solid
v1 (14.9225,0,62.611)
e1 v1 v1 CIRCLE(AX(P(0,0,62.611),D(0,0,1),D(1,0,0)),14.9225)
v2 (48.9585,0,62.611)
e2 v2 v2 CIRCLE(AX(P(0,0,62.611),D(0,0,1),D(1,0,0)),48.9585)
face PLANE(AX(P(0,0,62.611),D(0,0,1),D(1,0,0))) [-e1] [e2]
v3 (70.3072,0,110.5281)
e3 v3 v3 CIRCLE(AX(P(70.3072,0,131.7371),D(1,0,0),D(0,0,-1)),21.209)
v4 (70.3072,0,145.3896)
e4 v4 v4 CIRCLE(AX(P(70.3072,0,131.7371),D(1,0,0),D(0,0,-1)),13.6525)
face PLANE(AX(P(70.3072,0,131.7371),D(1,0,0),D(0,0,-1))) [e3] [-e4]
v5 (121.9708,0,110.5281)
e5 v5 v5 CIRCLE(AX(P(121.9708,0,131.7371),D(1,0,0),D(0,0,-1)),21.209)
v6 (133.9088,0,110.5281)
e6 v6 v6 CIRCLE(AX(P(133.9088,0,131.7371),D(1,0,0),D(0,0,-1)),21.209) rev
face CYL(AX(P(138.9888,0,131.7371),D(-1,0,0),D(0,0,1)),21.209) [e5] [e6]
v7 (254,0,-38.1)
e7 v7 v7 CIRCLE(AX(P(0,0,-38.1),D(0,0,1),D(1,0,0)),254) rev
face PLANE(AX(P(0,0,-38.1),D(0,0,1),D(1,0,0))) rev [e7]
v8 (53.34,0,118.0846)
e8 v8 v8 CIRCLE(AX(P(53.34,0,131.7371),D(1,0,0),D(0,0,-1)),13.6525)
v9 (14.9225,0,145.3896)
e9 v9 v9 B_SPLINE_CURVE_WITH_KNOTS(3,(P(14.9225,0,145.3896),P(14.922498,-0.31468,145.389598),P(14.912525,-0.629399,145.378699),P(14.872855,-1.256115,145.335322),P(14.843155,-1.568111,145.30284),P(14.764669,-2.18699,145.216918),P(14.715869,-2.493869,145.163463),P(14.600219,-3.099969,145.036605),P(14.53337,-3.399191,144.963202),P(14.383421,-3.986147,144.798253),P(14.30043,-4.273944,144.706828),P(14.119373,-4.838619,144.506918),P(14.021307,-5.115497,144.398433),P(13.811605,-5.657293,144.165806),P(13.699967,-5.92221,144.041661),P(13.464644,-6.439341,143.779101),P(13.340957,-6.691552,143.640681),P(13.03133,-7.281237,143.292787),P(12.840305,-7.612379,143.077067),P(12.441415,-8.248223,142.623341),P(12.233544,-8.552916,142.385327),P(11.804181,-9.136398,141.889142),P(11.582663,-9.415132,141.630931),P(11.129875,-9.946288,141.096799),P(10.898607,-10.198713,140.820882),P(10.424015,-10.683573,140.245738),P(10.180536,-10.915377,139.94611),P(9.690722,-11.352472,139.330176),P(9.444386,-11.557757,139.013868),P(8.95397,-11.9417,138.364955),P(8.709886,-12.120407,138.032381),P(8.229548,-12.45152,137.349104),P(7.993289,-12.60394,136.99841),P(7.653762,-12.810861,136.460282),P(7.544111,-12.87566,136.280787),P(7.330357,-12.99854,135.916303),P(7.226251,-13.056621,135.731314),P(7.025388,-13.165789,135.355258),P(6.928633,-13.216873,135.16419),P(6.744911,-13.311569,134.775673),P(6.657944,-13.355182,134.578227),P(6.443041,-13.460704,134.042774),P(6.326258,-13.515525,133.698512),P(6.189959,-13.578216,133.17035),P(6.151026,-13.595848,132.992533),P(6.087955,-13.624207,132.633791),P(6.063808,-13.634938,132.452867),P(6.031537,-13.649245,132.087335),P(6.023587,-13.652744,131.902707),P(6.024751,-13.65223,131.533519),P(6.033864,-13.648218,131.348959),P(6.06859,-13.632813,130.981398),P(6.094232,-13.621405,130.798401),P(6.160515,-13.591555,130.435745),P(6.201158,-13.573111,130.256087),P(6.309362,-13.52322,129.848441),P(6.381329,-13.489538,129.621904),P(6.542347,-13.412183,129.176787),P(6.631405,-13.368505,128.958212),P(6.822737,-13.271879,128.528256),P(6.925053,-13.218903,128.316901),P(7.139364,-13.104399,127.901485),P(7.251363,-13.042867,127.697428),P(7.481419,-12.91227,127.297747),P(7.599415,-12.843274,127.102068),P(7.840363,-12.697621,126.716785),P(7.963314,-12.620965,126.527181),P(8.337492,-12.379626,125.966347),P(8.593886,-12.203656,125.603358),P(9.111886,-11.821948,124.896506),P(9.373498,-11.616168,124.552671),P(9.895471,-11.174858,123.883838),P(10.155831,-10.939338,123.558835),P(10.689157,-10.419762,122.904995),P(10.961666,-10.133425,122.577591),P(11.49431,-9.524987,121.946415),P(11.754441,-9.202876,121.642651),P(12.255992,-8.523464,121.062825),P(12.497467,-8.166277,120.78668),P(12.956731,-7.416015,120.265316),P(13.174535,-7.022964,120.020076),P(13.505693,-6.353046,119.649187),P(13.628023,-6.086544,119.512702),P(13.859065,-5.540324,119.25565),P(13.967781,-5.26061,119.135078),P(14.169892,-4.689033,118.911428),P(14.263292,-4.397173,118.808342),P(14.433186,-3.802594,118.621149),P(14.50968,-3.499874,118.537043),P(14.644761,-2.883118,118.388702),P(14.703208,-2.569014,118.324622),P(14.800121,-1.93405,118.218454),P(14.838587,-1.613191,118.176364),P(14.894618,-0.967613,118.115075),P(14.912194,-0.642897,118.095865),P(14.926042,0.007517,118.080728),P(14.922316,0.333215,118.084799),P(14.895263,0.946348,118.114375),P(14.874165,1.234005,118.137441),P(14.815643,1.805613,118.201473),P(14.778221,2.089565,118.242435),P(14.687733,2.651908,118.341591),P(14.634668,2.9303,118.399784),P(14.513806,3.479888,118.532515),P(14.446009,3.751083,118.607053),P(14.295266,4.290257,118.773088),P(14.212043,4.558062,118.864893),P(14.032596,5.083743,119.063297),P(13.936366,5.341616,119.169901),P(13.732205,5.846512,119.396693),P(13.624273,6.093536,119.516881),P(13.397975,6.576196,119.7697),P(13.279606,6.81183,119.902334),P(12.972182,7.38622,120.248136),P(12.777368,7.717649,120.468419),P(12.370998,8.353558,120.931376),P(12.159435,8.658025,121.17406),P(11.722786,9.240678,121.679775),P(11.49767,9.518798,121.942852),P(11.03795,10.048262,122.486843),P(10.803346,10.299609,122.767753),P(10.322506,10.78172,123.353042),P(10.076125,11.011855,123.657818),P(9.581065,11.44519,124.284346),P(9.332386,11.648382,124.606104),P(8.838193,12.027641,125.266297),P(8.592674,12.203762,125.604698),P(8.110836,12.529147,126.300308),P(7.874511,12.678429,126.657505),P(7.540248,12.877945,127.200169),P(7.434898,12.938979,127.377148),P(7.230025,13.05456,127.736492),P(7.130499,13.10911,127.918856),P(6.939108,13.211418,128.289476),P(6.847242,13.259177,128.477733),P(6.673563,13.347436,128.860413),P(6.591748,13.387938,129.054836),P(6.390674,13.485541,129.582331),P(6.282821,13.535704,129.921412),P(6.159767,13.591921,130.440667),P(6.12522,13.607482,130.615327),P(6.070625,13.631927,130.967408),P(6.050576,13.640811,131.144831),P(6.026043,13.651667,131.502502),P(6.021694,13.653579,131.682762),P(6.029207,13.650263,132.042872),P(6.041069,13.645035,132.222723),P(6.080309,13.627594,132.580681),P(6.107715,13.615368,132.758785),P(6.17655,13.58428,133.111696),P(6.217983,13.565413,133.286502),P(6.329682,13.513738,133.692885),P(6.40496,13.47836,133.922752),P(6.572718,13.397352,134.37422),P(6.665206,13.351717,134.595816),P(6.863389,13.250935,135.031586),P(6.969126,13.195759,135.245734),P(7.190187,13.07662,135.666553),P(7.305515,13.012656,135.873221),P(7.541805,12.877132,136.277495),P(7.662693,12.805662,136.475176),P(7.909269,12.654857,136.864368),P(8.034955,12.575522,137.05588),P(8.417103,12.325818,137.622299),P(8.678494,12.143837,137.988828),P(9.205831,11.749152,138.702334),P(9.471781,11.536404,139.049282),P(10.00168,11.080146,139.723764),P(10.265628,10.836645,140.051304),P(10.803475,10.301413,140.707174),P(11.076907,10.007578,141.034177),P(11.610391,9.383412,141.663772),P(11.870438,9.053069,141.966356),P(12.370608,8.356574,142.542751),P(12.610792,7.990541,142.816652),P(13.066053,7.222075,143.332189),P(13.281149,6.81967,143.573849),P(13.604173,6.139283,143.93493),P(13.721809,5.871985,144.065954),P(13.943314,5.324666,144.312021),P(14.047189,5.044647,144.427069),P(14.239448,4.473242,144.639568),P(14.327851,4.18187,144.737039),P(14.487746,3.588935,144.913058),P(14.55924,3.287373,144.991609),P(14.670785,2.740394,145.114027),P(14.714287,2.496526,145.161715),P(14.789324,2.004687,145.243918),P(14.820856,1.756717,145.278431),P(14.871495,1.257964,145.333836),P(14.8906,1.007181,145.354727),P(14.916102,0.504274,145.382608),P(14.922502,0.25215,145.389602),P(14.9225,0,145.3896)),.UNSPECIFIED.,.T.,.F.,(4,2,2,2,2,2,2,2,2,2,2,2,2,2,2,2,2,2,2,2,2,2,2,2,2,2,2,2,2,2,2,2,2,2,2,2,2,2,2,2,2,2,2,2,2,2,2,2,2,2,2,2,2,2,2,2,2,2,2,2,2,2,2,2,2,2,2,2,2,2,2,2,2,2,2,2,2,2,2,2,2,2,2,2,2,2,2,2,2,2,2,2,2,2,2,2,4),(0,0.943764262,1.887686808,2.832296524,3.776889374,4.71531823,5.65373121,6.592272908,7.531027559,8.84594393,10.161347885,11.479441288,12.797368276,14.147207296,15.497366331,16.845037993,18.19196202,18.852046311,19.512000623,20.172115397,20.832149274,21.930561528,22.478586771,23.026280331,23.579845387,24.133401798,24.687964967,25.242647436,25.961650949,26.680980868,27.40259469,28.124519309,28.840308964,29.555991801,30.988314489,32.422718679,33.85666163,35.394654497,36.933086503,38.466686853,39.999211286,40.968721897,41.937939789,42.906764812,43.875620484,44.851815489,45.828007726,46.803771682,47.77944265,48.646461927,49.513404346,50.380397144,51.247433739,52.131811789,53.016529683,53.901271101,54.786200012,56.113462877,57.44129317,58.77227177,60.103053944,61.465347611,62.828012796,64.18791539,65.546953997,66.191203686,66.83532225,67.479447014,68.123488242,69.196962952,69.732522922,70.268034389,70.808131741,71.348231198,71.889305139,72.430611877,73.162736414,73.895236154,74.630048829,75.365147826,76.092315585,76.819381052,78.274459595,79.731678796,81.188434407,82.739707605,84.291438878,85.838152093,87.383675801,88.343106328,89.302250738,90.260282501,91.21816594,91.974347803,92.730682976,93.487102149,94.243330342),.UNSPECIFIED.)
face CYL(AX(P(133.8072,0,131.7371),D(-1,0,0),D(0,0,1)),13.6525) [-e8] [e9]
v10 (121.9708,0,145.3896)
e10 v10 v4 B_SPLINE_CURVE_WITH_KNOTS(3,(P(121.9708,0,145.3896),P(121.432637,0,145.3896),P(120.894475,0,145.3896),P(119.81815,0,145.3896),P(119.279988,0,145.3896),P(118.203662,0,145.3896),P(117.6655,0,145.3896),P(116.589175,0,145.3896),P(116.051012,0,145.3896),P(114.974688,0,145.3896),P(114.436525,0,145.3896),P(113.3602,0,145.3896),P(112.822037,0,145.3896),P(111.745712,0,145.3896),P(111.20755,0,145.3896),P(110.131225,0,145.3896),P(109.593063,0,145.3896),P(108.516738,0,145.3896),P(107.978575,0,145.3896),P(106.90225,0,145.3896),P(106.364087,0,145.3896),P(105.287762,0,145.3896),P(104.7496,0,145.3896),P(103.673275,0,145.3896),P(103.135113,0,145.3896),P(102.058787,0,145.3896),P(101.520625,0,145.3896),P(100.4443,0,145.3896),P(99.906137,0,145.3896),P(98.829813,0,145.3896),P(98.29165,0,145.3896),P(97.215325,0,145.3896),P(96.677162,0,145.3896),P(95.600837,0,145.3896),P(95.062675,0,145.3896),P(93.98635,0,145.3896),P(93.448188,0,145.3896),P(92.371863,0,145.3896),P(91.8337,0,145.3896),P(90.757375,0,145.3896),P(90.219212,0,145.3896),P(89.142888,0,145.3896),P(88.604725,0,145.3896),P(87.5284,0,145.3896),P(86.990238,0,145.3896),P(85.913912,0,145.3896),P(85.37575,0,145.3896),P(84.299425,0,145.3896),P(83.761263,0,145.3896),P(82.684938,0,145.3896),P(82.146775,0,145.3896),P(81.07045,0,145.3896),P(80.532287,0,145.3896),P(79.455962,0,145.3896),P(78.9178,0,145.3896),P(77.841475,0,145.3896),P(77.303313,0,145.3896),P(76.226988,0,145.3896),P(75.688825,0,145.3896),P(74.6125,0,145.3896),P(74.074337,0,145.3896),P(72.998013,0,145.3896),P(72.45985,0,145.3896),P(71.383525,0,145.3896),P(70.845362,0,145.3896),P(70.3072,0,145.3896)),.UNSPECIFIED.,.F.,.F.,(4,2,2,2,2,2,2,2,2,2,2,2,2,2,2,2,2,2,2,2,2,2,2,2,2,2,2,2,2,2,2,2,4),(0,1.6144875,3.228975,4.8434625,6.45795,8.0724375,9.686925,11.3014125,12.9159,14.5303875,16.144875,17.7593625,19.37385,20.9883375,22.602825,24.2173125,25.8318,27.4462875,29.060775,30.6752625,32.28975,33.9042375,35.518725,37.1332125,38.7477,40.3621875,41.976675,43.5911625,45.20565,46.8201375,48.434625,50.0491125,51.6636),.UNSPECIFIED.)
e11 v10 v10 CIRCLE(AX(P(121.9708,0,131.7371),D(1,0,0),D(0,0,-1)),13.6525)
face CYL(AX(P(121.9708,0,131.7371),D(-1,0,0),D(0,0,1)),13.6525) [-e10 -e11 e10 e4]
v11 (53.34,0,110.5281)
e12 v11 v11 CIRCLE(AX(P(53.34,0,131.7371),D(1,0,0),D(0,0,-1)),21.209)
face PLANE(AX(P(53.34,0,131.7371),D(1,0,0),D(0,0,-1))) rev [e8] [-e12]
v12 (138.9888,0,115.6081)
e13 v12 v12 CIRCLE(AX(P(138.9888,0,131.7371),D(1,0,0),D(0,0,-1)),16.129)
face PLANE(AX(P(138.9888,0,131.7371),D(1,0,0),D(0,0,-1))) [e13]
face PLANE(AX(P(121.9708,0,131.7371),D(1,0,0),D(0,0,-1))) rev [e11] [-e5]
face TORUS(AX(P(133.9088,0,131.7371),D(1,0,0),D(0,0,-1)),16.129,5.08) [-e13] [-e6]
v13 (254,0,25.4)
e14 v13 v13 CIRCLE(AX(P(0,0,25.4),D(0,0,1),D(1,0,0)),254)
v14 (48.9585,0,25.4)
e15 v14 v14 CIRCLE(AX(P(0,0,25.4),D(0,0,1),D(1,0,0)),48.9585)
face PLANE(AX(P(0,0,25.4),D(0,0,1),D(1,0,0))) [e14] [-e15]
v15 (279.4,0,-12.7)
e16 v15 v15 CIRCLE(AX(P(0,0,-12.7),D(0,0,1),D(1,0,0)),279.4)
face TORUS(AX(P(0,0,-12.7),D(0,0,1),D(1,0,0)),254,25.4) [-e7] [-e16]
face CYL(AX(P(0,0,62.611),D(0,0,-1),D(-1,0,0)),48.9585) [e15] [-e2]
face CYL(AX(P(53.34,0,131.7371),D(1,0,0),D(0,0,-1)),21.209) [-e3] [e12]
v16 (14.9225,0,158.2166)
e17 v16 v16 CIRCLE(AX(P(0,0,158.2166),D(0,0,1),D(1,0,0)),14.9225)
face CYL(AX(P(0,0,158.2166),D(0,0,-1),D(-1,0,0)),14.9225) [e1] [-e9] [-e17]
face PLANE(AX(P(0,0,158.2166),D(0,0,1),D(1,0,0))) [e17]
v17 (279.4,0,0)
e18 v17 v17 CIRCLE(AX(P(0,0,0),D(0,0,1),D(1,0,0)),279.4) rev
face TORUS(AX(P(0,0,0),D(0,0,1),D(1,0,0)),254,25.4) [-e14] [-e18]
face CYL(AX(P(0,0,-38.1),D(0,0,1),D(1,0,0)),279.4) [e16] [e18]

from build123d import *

# Parameters (mm, degrees)
EXTRUSION1_DEPTH      = 25.4
EXTRUSION1_DEPTH_BACK = 38.1
SKETCH1_R             = 279.4
FILLET1_R             = 25.4
SKETCH2_R             = 48.9585
EXTRUSION2_DEPTH      = 37.211
SKETCH3_R             = 14.9225
EXTRUSION3_DEPTH      = 95.6056
SKETCH4_R             = 13.6525
EXTRUSION4_DEPTH      = 133.8072
EXTRUSION5_START      = -80.4672
SKETCH5_R             = 21.209
SKETCH5_R_2           = 13.6525
EXTRUSION5_DEPTH      = 80.4672
EXTRUSION6_START      = -63.5
SKETCH6_R             = 21.209
EXTRUSION6_DEPTH      = 63.5
SKETCH7_R             = 13.6525
EXTRUSION7_DEPTH      = 51.6636
SKETCH8_R             = 21.209
EXTRUSION8_DEPTH      = 17.018
FILLET2_R             = 5.08


with BuildPart() as part:
    # Sketch1 → Extrusion1 (new, two sides: drawn at the far end of the back side and taken through both)
    with BuildSketch(Plane.XY.offset(-EXTRUSION1_DEPTH_BACK)):
        Circle(SKETCH1_R)
    extrude(amount=EXTRUSION1_DEPTH + EXTRUSION1_DEPTH_BACK)

    # Fillet1
    fillet1_edges = [part.edges().sort_by_distance(p)[0] for p in [
        (-279.4, 0, -38.1),
        (-279.4, 0, 25.4),
    ]]
    fillet(fillet1_edges, radius=FILLET1_R - 0.0001)  # a hair under: the kernel refuses the full size

    # Sketch2 → Extrusion2 (add)
    with BuildSketch(Plane.XY.offset(25.4)):
        with Locations(Location((0, 0, 0), (0, 0, 180))):
            Circle(SKETCH2_R)
    extrude(amount=EXTRUSION2_DEPTH)

    # Sketch3 → Extrusion3 (add)
    with BuildSketch(Plane.XY.offset(62.611)):
        Circle(SKETCH3_R)
    extrude(amount=EXTRUSION3_DEPTH)

    # Sketch4 → Extrusion4 (add)
    with BuildSketch(Plane.YZ):
        with Locations(Location((0, 131.7371, 0), (0, 0, 270))):
            Circle(SKETCH4_R)
    extrude(amount=EXTRUSION4_DEPTH)

    # Sketch5 → Extrusion5 (add)
    with BuildSketch(Plane(origin=(133.8072, 0, 0), x_dir=(0, 0, -1), z_dir=(1, 0, 0)).offset(EXTRUSION5_START)):
        with Locations((-131.7371, 0)):
            Circle(SKETCH5_R)
        with Locations(Location((-131.7371, 0, 0), (0, 0, 180))):
            Circle(SKETCH5_R_2, mode=Mode.SUBTRACT)
    extrude(amount=EXTRUSION5_DEPTH)

    # Sketch6 → Extrusion6 (cut)
    with BuildSketch(Plane(origin=(133.8072, 0, 0), x_dir=(0, 0, -1), z_dir=(1, 0, 0)).offset(EXTRUSION6_START)):
        with Locations((-131.7371, 0)):
            Circle(SKETCH6_R)
    extrude(amount=EXTRUSION6_DEPTH, mode=Mode.SUBTRACT)

    # Sketch7 → Extrusion7 (add)
    with BuildSketch(Plane(origin=(70.3072, 0, 0), x_dir=(0, 0, -1), z_dir=(1, 0, 0))):
        with Locations(Location((-131.7371, 0, 0), (0, 0, 180))):
            Circle(SKETCH7_R)
    extrude(amount=EXTRUSION7_DEPTH)

    # Sketch8 → Extrusion8 (add)
    with BuildSketch(Plane(origin=(121.9708, 0, 0), x_dir=(0, 0, -1), z_dir=(1, 0, 0))):
        with Locations((-131.7371, 0)):
            Circle(SKETCH8_R)
    extrude(amount=EXTRUSION8_DEPTH)

    # Fillet2
    fillet2_edges = [part.edges().sort_by_distance(p)[0] for p in [
        (138.9888, 0, 152.9461),
    ]]
    fillet(fillet2_edges, radius=FILLET2_R)


solid = part.part
